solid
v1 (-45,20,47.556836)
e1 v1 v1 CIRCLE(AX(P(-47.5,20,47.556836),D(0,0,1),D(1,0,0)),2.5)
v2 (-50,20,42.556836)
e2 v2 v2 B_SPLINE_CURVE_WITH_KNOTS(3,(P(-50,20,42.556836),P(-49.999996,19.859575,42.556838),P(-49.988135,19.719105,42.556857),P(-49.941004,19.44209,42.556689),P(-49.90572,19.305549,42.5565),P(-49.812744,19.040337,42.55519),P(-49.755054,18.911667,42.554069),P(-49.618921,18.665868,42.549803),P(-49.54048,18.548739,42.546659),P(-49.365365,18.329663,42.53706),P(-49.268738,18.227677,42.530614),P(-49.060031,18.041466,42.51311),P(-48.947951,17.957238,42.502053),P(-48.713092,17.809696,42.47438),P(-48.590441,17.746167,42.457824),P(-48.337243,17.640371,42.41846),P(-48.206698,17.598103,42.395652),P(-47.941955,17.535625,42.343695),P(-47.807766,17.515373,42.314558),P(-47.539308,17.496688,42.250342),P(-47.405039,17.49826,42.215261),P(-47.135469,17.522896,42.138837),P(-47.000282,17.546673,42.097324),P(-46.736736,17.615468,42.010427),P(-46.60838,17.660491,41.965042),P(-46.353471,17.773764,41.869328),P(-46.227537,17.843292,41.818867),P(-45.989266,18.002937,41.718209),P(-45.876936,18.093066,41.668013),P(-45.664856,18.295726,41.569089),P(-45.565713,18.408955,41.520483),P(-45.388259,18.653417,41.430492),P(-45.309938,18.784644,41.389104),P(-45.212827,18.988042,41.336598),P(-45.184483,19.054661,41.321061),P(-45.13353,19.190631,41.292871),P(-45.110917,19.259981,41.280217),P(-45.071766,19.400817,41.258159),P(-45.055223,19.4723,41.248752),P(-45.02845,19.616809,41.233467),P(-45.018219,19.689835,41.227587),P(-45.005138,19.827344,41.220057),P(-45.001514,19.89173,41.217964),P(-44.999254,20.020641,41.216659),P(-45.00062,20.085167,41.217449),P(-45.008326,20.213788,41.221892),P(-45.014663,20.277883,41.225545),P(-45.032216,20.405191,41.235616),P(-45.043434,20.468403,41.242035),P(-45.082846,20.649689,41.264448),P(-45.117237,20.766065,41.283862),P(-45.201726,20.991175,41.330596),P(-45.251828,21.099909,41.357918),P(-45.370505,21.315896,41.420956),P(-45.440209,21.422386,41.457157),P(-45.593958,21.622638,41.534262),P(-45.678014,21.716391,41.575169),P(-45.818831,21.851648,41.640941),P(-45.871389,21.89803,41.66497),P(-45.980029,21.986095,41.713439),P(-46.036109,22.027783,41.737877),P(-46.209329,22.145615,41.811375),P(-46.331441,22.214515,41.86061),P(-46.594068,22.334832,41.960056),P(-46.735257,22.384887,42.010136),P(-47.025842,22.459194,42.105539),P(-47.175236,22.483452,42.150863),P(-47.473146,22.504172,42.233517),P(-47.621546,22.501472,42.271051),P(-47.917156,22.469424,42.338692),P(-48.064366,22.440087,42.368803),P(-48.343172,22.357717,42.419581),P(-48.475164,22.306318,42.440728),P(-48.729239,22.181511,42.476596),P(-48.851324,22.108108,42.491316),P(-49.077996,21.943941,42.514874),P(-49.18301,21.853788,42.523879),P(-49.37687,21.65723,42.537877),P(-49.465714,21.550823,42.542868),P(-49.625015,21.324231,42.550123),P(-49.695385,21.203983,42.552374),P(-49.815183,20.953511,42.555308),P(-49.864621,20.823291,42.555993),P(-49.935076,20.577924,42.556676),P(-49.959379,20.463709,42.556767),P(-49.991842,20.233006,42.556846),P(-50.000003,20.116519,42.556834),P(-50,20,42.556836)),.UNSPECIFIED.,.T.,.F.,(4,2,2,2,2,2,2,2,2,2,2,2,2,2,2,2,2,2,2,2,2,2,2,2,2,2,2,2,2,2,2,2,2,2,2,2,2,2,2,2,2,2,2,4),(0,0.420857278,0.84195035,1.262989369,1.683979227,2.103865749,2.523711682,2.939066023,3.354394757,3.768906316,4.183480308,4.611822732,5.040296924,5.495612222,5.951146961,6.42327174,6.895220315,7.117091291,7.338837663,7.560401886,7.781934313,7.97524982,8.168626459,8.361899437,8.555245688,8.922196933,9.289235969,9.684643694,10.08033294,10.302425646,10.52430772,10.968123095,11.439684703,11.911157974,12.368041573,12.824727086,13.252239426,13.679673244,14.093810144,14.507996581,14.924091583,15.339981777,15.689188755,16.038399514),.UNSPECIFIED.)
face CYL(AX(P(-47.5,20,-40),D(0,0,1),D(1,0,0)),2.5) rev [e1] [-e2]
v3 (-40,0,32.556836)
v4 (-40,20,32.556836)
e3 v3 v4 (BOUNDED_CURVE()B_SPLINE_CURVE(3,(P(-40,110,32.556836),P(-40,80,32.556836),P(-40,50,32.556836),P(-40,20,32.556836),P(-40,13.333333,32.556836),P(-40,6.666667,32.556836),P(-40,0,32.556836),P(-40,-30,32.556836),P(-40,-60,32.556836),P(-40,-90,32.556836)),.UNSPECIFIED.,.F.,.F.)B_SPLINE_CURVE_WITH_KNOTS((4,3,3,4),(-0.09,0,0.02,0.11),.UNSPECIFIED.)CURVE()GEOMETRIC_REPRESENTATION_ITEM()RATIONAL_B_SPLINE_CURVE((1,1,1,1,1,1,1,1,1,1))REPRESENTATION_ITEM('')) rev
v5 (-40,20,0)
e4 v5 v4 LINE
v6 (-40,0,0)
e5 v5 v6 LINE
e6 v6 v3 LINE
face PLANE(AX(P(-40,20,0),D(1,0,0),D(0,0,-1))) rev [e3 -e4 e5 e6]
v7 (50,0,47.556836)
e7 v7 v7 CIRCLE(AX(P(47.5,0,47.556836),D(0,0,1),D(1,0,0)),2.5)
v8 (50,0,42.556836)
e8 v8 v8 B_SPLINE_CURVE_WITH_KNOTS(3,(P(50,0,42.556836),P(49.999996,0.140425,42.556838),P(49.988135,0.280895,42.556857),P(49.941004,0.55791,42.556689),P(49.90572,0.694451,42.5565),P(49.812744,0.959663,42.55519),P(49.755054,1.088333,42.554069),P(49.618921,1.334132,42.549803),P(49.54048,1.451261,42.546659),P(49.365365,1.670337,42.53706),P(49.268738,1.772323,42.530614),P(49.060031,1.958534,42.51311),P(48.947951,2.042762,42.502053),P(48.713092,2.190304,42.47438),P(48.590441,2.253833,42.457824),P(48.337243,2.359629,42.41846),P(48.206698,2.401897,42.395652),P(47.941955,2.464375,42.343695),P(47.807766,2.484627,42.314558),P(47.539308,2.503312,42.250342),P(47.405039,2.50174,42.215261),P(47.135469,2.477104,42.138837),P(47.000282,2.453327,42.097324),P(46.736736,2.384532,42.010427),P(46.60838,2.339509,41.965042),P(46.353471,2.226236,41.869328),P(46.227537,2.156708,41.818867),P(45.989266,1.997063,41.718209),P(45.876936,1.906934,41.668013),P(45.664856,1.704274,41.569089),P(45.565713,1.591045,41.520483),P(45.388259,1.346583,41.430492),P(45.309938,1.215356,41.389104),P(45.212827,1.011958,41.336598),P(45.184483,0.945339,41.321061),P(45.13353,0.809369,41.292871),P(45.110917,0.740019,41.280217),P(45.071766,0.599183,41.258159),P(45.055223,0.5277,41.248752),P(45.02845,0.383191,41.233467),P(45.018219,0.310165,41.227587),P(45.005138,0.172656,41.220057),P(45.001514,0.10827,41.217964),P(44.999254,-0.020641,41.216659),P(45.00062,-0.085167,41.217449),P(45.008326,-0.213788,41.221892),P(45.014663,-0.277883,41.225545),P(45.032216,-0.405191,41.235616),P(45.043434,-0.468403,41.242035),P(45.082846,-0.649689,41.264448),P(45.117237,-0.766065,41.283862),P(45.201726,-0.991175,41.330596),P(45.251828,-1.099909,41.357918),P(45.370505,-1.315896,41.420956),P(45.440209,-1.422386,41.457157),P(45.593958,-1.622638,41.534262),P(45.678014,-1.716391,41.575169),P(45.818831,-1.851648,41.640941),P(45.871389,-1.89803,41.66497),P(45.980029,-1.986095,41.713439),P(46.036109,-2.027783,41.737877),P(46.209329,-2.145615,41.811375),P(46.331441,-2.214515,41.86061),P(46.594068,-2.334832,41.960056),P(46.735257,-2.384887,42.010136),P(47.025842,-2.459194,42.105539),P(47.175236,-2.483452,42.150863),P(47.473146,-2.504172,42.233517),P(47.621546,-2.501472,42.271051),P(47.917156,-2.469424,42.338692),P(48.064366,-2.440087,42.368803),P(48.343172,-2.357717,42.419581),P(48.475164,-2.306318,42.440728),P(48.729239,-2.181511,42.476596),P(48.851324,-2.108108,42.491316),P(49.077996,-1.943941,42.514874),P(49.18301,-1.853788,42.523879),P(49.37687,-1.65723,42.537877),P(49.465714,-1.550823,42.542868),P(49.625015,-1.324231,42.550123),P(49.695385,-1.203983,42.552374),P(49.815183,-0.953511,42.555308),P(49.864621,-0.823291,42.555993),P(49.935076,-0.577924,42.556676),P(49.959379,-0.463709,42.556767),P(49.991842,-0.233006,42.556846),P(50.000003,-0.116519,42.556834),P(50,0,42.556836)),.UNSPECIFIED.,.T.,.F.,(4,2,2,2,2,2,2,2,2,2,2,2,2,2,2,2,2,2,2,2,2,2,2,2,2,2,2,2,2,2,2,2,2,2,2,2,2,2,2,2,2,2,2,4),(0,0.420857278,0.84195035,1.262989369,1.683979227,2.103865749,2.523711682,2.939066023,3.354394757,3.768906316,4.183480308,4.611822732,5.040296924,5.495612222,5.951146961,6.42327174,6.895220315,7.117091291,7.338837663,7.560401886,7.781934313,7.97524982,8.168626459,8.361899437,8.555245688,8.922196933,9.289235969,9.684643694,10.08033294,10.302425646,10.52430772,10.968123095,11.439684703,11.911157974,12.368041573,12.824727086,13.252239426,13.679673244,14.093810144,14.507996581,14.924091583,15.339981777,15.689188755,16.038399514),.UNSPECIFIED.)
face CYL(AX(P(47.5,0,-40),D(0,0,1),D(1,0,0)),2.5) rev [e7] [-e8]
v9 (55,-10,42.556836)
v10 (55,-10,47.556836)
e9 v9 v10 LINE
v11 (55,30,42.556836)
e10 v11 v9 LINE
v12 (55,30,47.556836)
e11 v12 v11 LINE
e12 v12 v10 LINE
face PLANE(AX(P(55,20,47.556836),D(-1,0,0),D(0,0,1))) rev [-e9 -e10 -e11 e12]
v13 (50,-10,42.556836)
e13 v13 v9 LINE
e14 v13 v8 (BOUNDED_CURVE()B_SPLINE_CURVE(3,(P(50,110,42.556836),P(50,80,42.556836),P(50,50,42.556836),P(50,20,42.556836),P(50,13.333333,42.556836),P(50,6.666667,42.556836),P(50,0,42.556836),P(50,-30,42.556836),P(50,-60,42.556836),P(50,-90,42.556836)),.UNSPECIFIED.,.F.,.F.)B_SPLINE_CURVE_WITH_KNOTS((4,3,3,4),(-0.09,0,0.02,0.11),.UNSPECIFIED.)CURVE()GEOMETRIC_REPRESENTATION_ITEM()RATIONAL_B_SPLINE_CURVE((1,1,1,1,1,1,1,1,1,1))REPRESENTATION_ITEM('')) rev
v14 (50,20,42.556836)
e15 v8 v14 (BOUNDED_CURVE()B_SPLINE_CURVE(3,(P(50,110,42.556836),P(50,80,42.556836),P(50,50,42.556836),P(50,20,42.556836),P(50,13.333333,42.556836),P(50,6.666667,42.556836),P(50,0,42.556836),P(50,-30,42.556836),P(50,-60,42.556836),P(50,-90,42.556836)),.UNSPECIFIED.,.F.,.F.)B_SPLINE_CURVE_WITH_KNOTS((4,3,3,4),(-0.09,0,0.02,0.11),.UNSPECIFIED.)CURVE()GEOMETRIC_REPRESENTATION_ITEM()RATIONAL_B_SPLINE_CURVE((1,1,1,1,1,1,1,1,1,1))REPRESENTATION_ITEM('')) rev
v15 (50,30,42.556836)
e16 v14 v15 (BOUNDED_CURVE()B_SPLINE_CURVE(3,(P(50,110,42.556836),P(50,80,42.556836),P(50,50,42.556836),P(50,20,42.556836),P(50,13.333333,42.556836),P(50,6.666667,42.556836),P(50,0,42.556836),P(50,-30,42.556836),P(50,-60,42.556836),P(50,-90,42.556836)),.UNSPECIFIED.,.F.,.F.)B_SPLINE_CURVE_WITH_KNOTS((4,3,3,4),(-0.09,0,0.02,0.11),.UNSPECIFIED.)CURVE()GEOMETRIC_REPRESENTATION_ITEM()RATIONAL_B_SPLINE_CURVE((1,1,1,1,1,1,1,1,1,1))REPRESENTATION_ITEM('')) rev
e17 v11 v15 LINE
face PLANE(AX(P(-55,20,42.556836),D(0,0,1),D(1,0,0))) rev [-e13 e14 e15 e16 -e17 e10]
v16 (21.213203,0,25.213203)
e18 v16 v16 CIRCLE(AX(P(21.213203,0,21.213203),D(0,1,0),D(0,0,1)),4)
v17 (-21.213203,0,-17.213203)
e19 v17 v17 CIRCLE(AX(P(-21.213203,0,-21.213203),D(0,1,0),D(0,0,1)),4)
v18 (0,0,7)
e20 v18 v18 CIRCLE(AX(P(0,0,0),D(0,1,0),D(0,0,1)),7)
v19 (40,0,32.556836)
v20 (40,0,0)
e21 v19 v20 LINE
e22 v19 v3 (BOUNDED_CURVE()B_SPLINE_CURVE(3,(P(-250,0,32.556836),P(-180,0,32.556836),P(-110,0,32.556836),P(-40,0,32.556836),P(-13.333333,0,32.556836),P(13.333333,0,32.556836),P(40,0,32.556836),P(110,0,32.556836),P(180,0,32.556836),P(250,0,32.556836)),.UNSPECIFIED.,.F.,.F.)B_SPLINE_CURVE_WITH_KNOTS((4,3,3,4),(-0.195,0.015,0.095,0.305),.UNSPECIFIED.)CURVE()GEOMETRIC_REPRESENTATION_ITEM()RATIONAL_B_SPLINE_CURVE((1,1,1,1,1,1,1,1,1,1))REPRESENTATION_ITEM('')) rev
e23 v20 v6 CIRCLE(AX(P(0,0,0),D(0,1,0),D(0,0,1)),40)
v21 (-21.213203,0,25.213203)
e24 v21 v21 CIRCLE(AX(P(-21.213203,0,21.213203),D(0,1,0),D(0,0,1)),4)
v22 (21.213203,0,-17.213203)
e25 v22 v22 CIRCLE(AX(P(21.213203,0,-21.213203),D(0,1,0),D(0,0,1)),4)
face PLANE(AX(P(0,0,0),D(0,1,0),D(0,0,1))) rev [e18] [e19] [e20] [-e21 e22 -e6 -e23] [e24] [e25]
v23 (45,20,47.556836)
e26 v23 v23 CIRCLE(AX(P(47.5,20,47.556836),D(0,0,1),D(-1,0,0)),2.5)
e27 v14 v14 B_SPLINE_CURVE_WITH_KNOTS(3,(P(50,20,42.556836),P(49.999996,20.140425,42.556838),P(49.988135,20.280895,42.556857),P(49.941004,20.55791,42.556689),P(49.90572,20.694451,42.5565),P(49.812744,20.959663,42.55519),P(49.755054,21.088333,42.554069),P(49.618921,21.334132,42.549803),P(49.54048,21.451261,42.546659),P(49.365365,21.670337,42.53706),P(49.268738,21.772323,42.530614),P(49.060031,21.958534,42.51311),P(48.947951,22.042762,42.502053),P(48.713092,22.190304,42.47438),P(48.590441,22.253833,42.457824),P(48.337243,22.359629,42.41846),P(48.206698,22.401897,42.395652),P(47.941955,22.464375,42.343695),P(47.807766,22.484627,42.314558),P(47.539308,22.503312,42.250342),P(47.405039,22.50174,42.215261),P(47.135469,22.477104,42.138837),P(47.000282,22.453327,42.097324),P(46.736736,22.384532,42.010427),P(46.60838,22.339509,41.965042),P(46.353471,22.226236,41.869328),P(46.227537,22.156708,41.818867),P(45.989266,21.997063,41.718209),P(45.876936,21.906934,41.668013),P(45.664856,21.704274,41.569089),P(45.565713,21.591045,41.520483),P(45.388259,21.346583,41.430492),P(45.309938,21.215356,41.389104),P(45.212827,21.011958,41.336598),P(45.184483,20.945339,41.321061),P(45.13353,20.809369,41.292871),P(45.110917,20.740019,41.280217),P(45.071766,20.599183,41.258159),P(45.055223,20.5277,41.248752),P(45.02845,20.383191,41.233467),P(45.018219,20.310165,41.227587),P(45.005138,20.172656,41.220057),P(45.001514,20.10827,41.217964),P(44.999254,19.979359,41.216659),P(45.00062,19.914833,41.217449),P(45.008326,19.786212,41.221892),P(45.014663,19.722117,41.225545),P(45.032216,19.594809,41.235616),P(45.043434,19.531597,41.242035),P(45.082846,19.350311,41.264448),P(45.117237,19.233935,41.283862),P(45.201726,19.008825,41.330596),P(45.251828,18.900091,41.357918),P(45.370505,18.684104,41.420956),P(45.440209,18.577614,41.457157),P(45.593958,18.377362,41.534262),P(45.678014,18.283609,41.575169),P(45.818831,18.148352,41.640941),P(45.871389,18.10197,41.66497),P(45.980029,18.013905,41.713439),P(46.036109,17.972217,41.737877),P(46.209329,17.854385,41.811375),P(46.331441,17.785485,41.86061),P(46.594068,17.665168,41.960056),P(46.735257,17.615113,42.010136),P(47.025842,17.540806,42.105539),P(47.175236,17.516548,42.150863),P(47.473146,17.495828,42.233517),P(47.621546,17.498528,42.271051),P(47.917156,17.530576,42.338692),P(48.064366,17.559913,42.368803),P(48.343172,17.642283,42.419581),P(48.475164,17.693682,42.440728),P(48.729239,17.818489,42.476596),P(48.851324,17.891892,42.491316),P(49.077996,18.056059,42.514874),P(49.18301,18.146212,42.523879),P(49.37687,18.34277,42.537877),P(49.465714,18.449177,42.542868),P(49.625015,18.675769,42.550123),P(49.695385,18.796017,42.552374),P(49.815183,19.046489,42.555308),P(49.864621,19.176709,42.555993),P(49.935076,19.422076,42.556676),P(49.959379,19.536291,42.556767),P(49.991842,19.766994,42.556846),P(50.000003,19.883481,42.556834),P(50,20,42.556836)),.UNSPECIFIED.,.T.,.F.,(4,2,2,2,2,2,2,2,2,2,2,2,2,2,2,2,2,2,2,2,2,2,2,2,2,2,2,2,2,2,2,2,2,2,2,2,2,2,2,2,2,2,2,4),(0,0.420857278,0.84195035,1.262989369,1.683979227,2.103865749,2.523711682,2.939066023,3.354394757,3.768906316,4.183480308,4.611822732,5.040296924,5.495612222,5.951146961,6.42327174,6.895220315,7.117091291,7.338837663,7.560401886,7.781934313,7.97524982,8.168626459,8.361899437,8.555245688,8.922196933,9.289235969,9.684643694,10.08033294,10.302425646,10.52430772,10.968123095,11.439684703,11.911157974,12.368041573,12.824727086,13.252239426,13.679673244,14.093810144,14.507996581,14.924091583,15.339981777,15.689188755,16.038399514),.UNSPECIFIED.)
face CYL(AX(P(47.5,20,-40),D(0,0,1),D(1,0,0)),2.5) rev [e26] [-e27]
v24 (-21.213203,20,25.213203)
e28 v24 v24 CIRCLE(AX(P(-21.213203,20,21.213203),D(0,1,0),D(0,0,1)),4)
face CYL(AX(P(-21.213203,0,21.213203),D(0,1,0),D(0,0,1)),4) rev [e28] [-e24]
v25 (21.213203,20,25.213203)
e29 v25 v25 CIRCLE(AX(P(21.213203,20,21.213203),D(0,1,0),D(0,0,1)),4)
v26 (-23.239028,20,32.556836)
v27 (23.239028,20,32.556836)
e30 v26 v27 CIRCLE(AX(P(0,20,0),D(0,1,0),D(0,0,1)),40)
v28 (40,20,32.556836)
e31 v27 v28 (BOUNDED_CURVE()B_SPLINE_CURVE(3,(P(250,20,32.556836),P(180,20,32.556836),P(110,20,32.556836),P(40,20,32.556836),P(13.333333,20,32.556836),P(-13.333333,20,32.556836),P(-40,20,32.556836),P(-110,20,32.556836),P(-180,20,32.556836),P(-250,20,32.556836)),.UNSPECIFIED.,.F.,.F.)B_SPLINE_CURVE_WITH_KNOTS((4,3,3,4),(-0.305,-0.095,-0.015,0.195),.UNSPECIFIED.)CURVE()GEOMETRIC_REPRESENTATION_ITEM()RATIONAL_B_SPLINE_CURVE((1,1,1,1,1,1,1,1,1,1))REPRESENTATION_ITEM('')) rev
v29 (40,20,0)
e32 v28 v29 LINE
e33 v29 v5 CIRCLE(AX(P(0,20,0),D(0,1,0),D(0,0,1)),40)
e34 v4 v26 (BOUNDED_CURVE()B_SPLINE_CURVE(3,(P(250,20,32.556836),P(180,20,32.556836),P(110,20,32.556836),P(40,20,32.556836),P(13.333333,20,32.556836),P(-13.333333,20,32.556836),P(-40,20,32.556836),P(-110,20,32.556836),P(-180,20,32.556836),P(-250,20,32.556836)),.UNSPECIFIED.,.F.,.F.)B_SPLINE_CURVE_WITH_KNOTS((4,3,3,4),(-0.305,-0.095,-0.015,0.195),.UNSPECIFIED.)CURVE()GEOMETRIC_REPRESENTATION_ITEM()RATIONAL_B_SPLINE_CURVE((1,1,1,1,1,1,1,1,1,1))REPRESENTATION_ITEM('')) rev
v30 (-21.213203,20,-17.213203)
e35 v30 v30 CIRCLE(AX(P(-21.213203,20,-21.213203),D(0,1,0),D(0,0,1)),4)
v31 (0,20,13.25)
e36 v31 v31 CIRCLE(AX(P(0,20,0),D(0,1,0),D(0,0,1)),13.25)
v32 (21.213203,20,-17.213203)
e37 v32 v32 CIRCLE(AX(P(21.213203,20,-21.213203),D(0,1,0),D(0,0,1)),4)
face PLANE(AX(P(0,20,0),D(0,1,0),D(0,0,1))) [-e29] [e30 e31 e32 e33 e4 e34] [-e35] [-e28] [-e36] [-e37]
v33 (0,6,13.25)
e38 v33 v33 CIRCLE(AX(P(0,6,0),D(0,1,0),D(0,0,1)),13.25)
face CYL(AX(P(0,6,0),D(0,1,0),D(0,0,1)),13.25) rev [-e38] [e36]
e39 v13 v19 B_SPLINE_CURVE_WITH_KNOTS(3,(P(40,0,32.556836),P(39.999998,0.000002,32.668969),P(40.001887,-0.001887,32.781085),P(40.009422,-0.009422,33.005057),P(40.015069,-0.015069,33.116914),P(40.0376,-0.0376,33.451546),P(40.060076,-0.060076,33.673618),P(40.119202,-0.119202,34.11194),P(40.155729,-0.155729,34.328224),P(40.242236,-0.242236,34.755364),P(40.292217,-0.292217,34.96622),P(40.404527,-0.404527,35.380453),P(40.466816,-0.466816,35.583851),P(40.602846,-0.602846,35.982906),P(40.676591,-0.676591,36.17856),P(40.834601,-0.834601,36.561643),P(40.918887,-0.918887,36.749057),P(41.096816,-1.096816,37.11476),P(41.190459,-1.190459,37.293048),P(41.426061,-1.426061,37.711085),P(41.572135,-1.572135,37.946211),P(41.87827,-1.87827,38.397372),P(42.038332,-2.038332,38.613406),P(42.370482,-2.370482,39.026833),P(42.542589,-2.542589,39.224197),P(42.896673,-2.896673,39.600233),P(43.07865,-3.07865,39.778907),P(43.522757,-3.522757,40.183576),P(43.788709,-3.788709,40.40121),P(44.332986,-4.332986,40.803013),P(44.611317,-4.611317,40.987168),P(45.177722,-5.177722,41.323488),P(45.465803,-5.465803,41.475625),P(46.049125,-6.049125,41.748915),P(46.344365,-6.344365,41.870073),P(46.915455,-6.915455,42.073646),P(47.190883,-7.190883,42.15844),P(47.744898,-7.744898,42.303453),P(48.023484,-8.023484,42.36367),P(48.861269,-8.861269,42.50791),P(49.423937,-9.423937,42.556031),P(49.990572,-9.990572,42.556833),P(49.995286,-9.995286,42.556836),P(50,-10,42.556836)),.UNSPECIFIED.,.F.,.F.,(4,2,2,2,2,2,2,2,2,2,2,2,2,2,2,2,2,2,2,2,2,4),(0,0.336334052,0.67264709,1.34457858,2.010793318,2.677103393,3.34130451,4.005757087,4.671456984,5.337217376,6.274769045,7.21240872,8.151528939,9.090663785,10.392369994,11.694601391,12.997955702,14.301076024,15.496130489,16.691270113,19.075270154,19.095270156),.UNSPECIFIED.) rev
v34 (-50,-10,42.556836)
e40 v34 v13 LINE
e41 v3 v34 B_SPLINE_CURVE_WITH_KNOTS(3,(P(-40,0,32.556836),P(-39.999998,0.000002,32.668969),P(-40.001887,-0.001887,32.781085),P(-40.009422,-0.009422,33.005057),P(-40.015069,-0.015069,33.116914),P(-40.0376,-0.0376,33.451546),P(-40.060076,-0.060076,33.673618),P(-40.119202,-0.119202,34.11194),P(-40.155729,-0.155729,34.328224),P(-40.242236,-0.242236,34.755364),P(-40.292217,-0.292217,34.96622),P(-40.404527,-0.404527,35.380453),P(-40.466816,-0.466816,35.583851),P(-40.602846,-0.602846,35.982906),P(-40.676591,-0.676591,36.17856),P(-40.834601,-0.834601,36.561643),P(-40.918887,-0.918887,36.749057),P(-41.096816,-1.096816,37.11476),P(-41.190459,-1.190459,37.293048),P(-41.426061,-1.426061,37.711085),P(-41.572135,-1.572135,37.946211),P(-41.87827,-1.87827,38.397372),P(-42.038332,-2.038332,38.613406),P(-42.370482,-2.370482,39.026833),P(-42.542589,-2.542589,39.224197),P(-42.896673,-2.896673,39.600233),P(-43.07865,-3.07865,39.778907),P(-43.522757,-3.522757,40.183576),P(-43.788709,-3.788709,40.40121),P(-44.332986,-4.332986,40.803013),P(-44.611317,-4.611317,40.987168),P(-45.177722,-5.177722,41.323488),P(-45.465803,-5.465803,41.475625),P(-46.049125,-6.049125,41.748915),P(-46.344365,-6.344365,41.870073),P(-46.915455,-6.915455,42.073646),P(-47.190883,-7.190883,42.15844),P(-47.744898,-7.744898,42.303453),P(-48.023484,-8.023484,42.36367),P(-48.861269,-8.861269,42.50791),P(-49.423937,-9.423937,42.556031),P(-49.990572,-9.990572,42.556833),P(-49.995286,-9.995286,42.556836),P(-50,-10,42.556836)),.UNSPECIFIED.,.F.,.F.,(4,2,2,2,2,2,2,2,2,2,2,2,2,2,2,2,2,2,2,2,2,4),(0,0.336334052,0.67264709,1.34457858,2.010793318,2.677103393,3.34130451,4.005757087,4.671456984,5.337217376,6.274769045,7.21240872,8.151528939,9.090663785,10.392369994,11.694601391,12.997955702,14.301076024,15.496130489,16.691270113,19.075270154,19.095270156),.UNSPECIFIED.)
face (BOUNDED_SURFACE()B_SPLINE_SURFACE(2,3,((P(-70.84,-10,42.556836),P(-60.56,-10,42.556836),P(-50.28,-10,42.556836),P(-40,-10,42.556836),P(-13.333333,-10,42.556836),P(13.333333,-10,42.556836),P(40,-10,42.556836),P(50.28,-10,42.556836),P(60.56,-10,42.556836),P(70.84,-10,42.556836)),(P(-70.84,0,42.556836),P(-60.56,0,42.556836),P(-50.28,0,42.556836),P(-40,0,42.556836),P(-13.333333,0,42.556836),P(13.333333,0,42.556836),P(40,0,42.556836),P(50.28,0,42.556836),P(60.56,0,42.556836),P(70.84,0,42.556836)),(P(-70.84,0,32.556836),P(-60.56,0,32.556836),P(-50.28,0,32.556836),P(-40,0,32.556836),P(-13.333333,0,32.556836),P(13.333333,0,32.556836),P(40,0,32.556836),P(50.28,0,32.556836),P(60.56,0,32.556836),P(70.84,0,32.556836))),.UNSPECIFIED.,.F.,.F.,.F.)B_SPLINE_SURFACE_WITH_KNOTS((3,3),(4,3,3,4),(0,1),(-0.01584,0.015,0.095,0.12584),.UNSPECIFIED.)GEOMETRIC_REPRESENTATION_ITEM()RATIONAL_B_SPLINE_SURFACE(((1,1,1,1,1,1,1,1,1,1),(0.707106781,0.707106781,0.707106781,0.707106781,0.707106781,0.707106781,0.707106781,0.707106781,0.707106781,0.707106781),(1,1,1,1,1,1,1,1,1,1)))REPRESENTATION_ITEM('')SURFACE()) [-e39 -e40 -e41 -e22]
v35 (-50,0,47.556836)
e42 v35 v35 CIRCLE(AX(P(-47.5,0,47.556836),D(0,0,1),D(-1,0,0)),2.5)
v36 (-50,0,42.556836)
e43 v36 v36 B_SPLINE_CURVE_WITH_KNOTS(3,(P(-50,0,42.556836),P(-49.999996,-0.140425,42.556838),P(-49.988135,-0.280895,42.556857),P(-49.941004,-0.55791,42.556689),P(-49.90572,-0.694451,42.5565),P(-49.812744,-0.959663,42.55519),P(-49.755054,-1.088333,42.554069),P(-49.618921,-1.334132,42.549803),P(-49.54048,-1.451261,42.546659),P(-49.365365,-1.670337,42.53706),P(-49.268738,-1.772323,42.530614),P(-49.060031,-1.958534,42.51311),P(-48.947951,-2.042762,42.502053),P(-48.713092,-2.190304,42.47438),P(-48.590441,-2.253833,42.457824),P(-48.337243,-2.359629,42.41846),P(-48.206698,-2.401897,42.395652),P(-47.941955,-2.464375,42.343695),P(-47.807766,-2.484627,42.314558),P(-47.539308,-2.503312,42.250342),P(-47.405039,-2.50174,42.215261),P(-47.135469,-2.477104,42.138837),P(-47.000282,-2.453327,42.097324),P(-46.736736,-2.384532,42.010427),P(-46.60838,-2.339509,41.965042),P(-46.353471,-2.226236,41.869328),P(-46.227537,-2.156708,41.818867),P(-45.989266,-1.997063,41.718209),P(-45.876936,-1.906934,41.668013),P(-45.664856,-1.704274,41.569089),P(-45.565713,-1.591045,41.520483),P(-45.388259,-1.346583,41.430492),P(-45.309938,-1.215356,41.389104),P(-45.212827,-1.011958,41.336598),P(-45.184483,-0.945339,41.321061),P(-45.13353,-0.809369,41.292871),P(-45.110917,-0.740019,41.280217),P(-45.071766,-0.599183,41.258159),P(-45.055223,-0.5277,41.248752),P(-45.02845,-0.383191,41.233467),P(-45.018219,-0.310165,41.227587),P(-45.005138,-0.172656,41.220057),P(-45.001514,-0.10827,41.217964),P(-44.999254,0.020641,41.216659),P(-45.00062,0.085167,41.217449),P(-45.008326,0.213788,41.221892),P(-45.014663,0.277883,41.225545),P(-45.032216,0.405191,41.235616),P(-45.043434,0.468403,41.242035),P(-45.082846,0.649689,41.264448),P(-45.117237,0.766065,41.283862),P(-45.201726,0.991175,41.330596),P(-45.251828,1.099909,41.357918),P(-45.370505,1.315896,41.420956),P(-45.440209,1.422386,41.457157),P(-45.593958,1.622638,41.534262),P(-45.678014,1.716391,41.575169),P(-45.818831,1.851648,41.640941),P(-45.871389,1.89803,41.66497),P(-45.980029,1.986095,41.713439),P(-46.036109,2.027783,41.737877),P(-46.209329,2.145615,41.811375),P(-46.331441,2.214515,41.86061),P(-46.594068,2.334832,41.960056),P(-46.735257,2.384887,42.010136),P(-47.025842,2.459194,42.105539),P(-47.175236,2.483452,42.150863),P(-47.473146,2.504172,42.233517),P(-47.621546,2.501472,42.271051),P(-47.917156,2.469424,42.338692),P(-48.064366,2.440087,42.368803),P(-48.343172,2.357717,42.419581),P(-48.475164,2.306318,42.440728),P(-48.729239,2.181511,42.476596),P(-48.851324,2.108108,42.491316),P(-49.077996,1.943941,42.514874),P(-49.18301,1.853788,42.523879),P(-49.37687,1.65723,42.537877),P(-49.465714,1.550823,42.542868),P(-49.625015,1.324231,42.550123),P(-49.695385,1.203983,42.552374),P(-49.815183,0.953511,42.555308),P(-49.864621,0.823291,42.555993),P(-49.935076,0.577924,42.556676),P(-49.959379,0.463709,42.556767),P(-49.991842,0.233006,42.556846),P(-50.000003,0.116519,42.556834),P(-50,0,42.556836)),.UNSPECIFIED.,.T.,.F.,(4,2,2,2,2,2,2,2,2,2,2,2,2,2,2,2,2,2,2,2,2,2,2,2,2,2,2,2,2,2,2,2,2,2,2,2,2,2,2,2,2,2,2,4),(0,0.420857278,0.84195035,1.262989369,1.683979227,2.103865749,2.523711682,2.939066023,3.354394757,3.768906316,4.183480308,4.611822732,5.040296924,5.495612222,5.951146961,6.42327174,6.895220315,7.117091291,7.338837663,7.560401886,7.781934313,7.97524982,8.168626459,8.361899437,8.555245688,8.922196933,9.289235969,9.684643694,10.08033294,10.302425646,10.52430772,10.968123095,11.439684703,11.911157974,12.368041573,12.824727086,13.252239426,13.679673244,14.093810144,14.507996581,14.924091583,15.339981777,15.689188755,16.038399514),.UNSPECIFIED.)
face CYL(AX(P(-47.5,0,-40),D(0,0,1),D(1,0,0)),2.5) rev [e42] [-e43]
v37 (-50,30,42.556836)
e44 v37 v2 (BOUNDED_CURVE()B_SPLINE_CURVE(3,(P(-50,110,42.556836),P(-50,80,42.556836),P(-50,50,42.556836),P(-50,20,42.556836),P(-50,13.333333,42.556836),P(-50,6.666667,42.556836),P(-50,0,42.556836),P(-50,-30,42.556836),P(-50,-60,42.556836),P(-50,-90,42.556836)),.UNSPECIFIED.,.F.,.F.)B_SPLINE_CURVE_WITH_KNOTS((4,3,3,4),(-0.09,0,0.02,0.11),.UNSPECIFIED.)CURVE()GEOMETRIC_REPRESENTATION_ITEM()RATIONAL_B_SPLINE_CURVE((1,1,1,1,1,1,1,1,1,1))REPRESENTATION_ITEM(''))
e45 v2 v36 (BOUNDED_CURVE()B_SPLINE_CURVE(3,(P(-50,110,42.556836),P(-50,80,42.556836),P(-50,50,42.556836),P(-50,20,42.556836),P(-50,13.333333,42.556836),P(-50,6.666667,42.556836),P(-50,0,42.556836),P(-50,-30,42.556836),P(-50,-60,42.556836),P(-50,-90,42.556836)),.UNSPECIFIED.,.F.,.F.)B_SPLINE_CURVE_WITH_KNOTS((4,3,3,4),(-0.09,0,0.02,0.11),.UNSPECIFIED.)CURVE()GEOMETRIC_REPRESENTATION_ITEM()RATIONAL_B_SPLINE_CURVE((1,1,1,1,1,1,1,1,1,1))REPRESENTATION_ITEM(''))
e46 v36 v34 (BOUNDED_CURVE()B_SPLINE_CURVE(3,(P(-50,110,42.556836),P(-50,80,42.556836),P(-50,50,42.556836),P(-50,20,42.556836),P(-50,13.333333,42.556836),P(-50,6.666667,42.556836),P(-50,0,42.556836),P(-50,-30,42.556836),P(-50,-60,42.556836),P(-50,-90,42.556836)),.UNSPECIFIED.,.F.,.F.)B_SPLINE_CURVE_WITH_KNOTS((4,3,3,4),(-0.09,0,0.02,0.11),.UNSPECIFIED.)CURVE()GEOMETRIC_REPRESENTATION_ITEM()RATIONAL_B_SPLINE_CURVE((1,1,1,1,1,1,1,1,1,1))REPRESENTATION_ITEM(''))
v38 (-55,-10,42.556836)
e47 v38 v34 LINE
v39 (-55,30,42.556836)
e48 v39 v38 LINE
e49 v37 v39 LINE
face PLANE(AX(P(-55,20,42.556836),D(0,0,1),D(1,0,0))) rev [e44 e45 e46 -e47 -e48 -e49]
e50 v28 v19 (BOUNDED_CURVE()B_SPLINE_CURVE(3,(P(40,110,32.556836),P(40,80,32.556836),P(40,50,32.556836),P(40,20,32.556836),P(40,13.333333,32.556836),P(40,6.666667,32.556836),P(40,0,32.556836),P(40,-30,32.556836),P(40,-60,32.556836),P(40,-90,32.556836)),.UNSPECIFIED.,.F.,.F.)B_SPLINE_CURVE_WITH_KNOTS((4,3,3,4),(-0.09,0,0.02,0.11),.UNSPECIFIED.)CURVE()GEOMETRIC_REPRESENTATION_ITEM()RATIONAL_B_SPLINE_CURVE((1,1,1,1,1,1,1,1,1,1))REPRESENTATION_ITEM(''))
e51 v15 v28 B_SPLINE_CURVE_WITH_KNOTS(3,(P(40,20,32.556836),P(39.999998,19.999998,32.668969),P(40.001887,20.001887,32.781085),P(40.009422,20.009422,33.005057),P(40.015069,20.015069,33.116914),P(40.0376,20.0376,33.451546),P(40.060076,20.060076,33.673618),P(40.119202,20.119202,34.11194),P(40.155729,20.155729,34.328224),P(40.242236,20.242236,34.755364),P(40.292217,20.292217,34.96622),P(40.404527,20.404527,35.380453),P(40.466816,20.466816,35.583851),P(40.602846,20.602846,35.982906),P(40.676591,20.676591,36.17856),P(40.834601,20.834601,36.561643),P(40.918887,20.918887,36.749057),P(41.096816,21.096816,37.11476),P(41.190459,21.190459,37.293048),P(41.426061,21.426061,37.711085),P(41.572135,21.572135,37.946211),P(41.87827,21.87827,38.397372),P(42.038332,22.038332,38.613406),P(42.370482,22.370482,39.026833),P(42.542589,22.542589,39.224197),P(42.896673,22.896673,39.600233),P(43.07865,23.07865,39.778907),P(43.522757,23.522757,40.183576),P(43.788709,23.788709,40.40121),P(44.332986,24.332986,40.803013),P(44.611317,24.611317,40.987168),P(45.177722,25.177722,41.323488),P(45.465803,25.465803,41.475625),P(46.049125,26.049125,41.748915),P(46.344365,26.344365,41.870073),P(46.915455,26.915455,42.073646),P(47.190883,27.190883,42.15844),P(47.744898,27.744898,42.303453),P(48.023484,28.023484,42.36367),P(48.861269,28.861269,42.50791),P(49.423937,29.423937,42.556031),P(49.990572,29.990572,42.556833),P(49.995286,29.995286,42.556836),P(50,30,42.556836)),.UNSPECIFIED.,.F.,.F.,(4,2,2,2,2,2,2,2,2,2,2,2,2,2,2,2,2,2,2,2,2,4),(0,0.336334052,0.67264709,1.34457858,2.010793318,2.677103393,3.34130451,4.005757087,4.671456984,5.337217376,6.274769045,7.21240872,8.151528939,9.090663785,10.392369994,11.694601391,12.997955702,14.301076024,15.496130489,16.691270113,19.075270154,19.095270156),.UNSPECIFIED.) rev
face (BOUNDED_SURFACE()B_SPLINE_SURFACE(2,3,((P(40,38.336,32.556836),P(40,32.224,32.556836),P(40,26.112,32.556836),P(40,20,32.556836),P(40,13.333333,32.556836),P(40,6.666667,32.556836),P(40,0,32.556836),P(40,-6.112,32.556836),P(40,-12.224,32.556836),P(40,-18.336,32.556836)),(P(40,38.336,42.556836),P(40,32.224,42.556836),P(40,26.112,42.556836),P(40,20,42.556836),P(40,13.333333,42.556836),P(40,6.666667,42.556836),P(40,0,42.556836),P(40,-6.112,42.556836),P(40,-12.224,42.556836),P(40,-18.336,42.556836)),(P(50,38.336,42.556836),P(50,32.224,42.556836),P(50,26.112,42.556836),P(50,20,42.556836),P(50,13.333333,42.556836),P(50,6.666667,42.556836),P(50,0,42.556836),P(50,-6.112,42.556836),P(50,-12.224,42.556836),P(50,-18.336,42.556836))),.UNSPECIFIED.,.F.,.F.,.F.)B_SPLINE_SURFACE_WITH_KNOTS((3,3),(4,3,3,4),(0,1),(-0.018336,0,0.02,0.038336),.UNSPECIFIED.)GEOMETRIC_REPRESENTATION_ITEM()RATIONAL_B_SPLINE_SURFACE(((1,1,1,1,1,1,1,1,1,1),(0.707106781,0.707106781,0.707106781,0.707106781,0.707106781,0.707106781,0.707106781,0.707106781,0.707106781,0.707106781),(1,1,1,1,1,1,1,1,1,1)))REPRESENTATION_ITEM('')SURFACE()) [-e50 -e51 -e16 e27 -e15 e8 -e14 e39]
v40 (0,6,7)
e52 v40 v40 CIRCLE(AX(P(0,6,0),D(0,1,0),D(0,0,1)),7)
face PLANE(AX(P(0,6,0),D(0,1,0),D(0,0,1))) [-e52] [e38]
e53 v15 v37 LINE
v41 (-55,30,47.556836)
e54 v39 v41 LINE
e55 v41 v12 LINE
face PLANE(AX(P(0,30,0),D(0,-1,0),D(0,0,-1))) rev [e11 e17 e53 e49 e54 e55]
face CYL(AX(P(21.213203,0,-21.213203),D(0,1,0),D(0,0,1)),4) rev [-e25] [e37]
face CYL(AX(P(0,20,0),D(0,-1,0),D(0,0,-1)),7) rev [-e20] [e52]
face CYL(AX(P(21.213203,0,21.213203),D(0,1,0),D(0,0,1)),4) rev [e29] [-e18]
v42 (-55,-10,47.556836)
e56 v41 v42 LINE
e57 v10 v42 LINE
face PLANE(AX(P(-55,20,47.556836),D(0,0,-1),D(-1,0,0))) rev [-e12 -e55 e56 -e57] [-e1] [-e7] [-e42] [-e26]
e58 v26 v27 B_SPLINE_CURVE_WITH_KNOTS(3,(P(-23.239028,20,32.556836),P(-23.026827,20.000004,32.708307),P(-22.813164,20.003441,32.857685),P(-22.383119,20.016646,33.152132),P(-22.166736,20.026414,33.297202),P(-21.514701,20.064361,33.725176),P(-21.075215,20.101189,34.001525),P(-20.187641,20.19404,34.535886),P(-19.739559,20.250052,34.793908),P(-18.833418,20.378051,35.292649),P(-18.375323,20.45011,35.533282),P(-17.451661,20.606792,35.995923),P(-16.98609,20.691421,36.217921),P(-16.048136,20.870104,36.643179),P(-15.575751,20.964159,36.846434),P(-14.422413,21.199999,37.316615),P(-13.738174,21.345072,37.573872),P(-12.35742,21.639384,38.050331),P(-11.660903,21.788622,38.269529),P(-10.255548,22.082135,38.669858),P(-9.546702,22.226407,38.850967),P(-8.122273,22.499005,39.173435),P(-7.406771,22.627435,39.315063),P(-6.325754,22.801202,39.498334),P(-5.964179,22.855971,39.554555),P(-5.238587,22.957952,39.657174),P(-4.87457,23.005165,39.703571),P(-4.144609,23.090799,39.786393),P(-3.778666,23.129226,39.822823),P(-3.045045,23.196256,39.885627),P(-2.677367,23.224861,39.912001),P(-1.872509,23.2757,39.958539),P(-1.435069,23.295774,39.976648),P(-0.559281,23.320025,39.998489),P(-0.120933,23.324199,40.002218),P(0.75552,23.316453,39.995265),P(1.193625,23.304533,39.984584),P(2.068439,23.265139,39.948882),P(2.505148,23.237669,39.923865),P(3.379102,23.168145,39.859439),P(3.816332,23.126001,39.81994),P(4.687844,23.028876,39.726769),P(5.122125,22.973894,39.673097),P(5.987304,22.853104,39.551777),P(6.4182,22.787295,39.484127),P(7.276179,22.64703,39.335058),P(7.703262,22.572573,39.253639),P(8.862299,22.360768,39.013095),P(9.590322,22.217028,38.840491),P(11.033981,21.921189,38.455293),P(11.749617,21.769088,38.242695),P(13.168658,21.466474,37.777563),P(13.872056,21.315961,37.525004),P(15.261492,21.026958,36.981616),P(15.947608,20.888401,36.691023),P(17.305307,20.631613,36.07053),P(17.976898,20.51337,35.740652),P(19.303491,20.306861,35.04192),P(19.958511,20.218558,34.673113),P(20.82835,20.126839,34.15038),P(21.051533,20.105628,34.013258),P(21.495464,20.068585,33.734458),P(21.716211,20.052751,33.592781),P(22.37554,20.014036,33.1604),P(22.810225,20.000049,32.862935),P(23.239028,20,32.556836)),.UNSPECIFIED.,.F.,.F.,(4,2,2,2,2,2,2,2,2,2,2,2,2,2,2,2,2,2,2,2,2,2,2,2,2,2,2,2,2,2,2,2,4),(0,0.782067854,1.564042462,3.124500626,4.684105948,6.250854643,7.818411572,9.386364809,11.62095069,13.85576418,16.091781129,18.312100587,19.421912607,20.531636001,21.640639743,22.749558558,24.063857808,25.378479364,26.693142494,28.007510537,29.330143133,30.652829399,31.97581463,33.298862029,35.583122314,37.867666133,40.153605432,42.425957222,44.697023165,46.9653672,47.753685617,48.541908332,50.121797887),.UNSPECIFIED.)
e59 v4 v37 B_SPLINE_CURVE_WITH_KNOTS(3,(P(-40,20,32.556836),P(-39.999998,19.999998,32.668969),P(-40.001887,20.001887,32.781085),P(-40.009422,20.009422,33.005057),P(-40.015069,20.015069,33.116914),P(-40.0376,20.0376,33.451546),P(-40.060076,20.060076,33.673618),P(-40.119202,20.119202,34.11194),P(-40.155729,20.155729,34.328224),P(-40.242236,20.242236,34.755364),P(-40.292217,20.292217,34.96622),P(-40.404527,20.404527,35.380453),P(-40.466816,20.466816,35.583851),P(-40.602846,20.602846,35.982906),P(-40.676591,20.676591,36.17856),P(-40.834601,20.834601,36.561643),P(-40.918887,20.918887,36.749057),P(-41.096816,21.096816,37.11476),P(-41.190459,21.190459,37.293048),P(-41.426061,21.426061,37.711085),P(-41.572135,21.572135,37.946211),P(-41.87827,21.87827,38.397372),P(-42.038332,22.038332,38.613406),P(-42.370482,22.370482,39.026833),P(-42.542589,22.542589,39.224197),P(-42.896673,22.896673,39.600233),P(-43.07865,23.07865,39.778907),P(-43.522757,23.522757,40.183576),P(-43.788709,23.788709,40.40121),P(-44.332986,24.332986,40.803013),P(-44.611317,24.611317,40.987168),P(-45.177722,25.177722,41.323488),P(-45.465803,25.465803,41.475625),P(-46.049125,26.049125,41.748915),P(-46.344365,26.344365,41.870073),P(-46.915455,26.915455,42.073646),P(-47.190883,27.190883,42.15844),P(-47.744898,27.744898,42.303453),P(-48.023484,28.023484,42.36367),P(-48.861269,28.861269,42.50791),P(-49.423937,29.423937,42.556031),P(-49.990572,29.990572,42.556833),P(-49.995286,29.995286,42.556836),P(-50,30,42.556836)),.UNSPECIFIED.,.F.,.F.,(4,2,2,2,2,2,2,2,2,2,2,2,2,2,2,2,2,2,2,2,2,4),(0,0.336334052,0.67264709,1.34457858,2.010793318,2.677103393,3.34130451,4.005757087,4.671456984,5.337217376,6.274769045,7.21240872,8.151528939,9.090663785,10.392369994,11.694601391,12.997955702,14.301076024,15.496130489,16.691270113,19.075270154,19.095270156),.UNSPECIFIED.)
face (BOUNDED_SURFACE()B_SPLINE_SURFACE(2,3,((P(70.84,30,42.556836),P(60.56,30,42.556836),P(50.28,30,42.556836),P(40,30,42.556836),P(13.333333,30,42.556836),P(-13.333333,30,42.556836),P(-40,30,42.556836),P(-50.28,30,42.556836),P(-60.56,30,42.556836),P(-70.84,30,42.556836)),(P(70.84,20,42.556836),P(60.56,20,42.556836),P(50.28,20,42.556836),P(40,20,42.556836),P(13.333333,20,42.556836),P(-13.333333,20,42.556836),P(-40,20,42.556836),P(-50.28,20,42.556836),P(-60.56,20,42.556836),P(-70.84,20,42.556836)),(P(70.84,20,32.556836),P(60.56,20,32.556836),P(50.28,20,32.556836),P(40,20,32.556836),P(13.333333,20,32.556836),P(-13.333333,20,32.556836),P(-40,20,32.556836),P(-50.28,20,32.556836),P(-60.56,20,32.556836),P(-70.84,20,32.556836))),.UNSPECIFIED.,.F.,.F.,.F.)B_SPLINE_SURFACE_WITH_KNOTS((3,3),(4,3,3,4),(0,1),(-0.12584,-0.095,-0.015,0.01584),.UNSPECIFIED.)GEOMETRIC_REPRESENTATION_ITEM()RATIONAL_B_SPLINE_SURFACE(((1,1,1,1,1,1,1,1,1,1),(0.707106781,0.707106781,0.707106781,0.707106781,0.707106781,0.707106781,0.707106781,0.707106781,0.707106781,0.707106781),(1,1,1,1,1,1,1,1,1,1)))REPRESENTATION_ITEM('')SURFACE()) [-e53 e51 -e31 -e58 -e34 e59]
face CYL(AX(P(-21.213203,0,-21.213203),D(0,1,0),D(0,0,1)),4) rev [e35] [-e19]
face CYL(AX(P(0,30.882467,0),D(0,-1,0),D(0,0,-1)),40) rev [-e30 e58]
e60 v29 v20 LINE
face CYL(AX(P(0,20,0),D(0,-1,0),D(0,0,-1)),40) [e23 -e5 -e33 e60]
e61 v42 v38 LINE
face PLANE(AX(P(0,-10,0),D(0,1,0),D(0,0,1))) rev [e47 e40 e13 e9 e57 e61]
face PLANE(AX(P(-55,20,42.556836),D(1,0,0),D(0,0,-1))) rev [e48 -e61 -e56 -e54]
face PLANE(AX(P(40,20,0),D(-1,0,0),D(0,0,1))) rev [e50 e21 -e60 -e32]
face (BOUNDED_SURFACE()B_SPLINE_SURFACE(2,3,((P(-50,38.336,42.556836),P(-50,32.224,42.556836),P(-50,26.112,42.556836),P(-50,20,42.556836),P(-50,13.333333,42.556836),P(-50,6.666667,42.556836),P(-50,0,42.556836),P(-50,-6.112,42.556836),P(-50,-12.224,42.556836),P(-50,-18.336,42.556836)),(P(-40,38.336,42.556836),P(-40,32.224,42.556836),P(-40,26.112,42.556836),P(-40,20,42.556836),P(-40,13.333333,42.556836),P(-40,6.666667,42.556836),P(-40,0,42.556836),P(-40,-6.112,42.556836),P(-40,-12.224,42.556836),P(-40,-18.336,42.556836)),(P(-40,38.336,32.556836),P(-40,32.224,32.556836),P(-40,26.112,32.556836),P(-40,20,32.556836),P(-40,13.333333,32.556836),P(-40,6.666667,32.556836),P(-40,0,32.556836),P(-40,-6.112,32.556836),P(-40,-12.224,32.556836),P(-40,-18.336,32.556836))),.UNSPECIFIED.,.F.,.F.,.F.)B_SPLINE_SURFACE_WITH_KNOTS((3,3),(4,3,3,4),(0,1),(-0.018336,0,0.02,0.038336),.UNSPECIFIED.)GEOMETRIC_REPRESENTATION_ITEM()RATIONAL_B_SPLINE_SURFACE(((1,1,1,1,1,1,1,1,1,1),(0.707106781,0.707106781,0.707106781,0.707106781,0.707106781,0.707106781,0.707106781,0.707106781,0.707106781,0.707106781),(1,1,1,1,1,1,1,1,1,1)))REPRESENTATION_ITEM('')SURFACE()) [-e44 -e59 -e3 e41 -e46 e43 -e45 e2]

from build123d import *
from build123d.topology import SkipClean

# Parameters (mm, degrees)
SKETCH1_R           = 7
BOSS_EXTRUDE1_DEPTH = 20
SKETCH2_R           = 13.25
CUT_EXTRUDE1_DEPTH  = 14
SKETCH3_R           = 4
CUT_EXTRUDE2_DEPTH  = 76.40989747
SKETCH4_W           = 110
SKETCH4_H           = 5
BOSS_EXTRUDE2_DEPTH = 10
SKETCH5_W           = 110
SKETCH5_H           = 5
BOSS_EXTRUDE3_DEPTH = 10
FILLET1_START       = -40
FILLET1_DEPTH       = 80
FILLET1_START_2     = -10.0000001
FILLET1_2_DEPTH     = 40.0000001
FILLET1_START_3     = -55.0000001
FILLET1_3_DEPTH     = 110.0000002
SKETCH6_R           = 2.5
CUT_EXTRUDE4_DEPTH  = 108.662433145
SKETCH8_R           = 40
CUT_EXTRUDE5_DEPTH  = 79.655277385


with BuildPart() as part:
    # Sketch1 → Boss-Extrude1 (new body)
    with BuildSketch(Plane(origin=(0, 0, 0), x_dir=(1, 0, 0), z_dir=(0, 1, 0))):
        with BuildLine():
            Line((-55, -42.556835854), (-40, -42.556835854))
            Line((-40, -42.556835854), (-40, 0))
            ThreePointArc((-40, 0), (0, 40), (40, 0))
            Line((40, 0), (40, -42.556835854))
            Line((40, -42.556835854), (55, -42.556835854))
            Line((55, -42.556835854), (55, -47.556835854))
            Line((55, -47.556835854), (-55, -47.556835854))
            Line((-55, -47.556835854), (-55, -42.556835854))
        make_face()
        with Locations(Location((0, 0, 0), (0, 0, 270))):
            Circle(SKETCH1_R, mode=Mode.SUBTRACT)
    extrude(amount=BOSS_EXTRUDE1_DEPTH)

    # Sketch2 → Cut-Extrude1 (cut)
    with BuildSketch(Plane(origin=(0, 20, 0), x_dir=(1, 0, 0), z_dir=(0, 1, 0))):
        with Locations(Location((0, 0, 0), (0, 0, 270))):
            Circle(SKETCH2_R)
    extrude(amount=-CUT_EXTRUDE1_DEPTH, mode=Mode.SUBTRACT)

    # Sketch3 → Cut-Extrude2 (cut, through all)
    with BuildSketch(Plane(origin=(0, 20, 0), x_dir=(1, 0, 0), z_dir=(0, 1, 0))):
        with Locations(Location((-21.213203436, 21.213203436, 0), (0, 0, 270))):
            Circle(SKETCH3_R)
        with Locations(Location((21.213203436, 21.213203436, 0), (0, 0, 270))):
            Circle(SKETCH3_R)
        with Locations(Location((21.213203436, -21.213203436, 0), (0, 0, 270))):
            Circle(SKETCH3_R)
        with Locations(Location((-21.213203436, -21.213203436, 0), (0, 0, 270))):
            Circle(SKETCH3_R)
    extrude(amount=-CUT_EXTRUDE2_DEPTH, mode=Mode.SUBTRACT)

    # Sketch4 → Boss-Extrude2 (add)
    with BuildSketch(Plane.XZ):
        with Locations((0, 45.056835854)):
            Rectangle(SKETCH4_W, SKETCH4_H)
    extrude(amount=BOSS_EXTRUDE2_DEPTH)

    # Sketch5 → Boss-Extrude3 (add)
    with BuildSketch(Plane(origin=(0, 20, 0), x_dir=(1, 0, 0), z_dir=(0, 1, 0))):
        with Locations((0, -45.056835854)):
            Rectangle(SKETCH5_W, SKETCH5_H)
    extrude(amount=BOSS_EXTRUDE3_DEPTH)

    # Fillet1: read off the stored shape, not the designer's step
    # Fillet1 outline → Fillet1 (add)
    with BuildSketch(Plane.YZ.offset(FILLET1_START)):
        with BuildLine():
            Line((0, 42.556835854), (-10, 42.556835854))
            add(Edge.make_bspline(
                [(-10, 42.556835854), (0, 42.556835854), (0, 32.556835854)],
                knots=[0, 0, 0, 1, 1, 1], degree=2, weights=[1, 0.707106781, 1]))
            Line((0, 32.556835854), (0, 42.556835854))
        make_face()
        with BuildLine():
            Line((30, 42.556835854), (20, 42.556835854))
            Line((20, 42.556835854), (20, 32.556835854))
            add(Edge.make_bspline(
                [(30, 42.556835854), (20, 42.556835854), (20, 32.556835854)],
                knots=[0, 0, 0, 1, 1, 1], degree=2, weights=[1, 0.707106781, 1]))
        make_face()
    extrude(amount=FILLET1_DEPTH)

    # Fillet1 2 outline → Fillet1 2 (add)
    with SkipClean():  # the faces are left unmerged after this step: merging them gives an invalid solid
        with BuildSketch(Plane(origin=(0, 0, 0), x_dir=(1, 0, 0), z_dir=(0, 1, 0)).offset(FILLET1_START_2)):
            with BuildLine():
                add(Edge.make_bspline(
                    [(40, -32.556835854), (40, -42.556835854), (50, -42.556835854)],
                    knots=[0, 0, 0, 1, 1, 1], degree=2, weights=[1, 0.707106781, 1]))
                Line((40, -32.556835854), (40, -42.556835854))
                Line((40, -42.556835854), (50, -42.556835854))
            make_face()
            with BuildLine():
                add(Edge.make_bspline(
                    [(-50, -42.556835854), (-40, -42.556835854), (-40, -32.556835854)],
                    knots=[0, 0, 0, 1, 1, 1], degree=2, weights=[1, 0.707106781, 1]))
                Line((-50, -42.556835854), (-40, -42.556835854))
                Line((-40, -42.556835854), (-40, -32.556835854))
            make_face()
        extrude(amount=FILLET1_2_DEPTH)

    # Fillet1 3 outline → Fillet1 3 (cut)
    with BuildSketch(Plane.YZ.offset(FILLET1_START_3)):
        with BuildLine():
            Line((-10, 42.556835854), (-10.0000001, 32.556835854))
            Line((-10.0000001, 32.556835854), (0, 32.556835854))
            add(Edge.make_bspline(
                [(-10, 42.556835854), (0, 42.556835854), (0, 32.556835854)],
                knots=[0, 0, 0, 1, 1, 1], degree=2, weights=[1, 0.707106781, 1]))
        make_face()
        with BuildLine():
            add(Edge.make_bspline(
                [(30, 42.556835854), (20, 42.556835854), (20, 32.556835854)],
                knots=[0, 0, 0, 1, 1, 1], degree=2, weights=[1, 0.707106781, 1]))
            Line((20, 32.556835854), (30, 32.556835854))
            Line((30, 32.556835854), (30, 42.556835854))
        make_face()
    extrude(amount=FILLET1_3_DEPTH, mode=Mode.SUBTRACT)

    # Sketch6 → Cut-Extrude4 (cut, through all)
    with BuildSketch(Plane.XY.offset(47.556835854)):
        with Locations((-47.5, 20)):
            Circle(SKETCH6_R)
        with Locations(Location((-47.5, 0, 0), (0, 0, 180))):
            Circle(SKETCH6_R)
        with Locations((47.5, 0)):
            Circle(SKETCH6_R)
        with Locations((47.5, 20)):
            Circle(SKETCH6_R)
    extrude(amount=-CUT_EXTRUDE4_DEPTH, mode=Mode.SUBTRACT)

    # Sketch8 → Cut-Extrude5 (cut, through all)
    with BuildSketch(Plane(origin=(0, 20, 0), x_dir=(1, 0, 0), z_dir=(0, 1, 0))):
        Circle(SKETCH8_R)
    extrude(amount=CUT_EXTRUDE5_DEPTH, mode=Mode.SUBTRACT)


solid = part.part
